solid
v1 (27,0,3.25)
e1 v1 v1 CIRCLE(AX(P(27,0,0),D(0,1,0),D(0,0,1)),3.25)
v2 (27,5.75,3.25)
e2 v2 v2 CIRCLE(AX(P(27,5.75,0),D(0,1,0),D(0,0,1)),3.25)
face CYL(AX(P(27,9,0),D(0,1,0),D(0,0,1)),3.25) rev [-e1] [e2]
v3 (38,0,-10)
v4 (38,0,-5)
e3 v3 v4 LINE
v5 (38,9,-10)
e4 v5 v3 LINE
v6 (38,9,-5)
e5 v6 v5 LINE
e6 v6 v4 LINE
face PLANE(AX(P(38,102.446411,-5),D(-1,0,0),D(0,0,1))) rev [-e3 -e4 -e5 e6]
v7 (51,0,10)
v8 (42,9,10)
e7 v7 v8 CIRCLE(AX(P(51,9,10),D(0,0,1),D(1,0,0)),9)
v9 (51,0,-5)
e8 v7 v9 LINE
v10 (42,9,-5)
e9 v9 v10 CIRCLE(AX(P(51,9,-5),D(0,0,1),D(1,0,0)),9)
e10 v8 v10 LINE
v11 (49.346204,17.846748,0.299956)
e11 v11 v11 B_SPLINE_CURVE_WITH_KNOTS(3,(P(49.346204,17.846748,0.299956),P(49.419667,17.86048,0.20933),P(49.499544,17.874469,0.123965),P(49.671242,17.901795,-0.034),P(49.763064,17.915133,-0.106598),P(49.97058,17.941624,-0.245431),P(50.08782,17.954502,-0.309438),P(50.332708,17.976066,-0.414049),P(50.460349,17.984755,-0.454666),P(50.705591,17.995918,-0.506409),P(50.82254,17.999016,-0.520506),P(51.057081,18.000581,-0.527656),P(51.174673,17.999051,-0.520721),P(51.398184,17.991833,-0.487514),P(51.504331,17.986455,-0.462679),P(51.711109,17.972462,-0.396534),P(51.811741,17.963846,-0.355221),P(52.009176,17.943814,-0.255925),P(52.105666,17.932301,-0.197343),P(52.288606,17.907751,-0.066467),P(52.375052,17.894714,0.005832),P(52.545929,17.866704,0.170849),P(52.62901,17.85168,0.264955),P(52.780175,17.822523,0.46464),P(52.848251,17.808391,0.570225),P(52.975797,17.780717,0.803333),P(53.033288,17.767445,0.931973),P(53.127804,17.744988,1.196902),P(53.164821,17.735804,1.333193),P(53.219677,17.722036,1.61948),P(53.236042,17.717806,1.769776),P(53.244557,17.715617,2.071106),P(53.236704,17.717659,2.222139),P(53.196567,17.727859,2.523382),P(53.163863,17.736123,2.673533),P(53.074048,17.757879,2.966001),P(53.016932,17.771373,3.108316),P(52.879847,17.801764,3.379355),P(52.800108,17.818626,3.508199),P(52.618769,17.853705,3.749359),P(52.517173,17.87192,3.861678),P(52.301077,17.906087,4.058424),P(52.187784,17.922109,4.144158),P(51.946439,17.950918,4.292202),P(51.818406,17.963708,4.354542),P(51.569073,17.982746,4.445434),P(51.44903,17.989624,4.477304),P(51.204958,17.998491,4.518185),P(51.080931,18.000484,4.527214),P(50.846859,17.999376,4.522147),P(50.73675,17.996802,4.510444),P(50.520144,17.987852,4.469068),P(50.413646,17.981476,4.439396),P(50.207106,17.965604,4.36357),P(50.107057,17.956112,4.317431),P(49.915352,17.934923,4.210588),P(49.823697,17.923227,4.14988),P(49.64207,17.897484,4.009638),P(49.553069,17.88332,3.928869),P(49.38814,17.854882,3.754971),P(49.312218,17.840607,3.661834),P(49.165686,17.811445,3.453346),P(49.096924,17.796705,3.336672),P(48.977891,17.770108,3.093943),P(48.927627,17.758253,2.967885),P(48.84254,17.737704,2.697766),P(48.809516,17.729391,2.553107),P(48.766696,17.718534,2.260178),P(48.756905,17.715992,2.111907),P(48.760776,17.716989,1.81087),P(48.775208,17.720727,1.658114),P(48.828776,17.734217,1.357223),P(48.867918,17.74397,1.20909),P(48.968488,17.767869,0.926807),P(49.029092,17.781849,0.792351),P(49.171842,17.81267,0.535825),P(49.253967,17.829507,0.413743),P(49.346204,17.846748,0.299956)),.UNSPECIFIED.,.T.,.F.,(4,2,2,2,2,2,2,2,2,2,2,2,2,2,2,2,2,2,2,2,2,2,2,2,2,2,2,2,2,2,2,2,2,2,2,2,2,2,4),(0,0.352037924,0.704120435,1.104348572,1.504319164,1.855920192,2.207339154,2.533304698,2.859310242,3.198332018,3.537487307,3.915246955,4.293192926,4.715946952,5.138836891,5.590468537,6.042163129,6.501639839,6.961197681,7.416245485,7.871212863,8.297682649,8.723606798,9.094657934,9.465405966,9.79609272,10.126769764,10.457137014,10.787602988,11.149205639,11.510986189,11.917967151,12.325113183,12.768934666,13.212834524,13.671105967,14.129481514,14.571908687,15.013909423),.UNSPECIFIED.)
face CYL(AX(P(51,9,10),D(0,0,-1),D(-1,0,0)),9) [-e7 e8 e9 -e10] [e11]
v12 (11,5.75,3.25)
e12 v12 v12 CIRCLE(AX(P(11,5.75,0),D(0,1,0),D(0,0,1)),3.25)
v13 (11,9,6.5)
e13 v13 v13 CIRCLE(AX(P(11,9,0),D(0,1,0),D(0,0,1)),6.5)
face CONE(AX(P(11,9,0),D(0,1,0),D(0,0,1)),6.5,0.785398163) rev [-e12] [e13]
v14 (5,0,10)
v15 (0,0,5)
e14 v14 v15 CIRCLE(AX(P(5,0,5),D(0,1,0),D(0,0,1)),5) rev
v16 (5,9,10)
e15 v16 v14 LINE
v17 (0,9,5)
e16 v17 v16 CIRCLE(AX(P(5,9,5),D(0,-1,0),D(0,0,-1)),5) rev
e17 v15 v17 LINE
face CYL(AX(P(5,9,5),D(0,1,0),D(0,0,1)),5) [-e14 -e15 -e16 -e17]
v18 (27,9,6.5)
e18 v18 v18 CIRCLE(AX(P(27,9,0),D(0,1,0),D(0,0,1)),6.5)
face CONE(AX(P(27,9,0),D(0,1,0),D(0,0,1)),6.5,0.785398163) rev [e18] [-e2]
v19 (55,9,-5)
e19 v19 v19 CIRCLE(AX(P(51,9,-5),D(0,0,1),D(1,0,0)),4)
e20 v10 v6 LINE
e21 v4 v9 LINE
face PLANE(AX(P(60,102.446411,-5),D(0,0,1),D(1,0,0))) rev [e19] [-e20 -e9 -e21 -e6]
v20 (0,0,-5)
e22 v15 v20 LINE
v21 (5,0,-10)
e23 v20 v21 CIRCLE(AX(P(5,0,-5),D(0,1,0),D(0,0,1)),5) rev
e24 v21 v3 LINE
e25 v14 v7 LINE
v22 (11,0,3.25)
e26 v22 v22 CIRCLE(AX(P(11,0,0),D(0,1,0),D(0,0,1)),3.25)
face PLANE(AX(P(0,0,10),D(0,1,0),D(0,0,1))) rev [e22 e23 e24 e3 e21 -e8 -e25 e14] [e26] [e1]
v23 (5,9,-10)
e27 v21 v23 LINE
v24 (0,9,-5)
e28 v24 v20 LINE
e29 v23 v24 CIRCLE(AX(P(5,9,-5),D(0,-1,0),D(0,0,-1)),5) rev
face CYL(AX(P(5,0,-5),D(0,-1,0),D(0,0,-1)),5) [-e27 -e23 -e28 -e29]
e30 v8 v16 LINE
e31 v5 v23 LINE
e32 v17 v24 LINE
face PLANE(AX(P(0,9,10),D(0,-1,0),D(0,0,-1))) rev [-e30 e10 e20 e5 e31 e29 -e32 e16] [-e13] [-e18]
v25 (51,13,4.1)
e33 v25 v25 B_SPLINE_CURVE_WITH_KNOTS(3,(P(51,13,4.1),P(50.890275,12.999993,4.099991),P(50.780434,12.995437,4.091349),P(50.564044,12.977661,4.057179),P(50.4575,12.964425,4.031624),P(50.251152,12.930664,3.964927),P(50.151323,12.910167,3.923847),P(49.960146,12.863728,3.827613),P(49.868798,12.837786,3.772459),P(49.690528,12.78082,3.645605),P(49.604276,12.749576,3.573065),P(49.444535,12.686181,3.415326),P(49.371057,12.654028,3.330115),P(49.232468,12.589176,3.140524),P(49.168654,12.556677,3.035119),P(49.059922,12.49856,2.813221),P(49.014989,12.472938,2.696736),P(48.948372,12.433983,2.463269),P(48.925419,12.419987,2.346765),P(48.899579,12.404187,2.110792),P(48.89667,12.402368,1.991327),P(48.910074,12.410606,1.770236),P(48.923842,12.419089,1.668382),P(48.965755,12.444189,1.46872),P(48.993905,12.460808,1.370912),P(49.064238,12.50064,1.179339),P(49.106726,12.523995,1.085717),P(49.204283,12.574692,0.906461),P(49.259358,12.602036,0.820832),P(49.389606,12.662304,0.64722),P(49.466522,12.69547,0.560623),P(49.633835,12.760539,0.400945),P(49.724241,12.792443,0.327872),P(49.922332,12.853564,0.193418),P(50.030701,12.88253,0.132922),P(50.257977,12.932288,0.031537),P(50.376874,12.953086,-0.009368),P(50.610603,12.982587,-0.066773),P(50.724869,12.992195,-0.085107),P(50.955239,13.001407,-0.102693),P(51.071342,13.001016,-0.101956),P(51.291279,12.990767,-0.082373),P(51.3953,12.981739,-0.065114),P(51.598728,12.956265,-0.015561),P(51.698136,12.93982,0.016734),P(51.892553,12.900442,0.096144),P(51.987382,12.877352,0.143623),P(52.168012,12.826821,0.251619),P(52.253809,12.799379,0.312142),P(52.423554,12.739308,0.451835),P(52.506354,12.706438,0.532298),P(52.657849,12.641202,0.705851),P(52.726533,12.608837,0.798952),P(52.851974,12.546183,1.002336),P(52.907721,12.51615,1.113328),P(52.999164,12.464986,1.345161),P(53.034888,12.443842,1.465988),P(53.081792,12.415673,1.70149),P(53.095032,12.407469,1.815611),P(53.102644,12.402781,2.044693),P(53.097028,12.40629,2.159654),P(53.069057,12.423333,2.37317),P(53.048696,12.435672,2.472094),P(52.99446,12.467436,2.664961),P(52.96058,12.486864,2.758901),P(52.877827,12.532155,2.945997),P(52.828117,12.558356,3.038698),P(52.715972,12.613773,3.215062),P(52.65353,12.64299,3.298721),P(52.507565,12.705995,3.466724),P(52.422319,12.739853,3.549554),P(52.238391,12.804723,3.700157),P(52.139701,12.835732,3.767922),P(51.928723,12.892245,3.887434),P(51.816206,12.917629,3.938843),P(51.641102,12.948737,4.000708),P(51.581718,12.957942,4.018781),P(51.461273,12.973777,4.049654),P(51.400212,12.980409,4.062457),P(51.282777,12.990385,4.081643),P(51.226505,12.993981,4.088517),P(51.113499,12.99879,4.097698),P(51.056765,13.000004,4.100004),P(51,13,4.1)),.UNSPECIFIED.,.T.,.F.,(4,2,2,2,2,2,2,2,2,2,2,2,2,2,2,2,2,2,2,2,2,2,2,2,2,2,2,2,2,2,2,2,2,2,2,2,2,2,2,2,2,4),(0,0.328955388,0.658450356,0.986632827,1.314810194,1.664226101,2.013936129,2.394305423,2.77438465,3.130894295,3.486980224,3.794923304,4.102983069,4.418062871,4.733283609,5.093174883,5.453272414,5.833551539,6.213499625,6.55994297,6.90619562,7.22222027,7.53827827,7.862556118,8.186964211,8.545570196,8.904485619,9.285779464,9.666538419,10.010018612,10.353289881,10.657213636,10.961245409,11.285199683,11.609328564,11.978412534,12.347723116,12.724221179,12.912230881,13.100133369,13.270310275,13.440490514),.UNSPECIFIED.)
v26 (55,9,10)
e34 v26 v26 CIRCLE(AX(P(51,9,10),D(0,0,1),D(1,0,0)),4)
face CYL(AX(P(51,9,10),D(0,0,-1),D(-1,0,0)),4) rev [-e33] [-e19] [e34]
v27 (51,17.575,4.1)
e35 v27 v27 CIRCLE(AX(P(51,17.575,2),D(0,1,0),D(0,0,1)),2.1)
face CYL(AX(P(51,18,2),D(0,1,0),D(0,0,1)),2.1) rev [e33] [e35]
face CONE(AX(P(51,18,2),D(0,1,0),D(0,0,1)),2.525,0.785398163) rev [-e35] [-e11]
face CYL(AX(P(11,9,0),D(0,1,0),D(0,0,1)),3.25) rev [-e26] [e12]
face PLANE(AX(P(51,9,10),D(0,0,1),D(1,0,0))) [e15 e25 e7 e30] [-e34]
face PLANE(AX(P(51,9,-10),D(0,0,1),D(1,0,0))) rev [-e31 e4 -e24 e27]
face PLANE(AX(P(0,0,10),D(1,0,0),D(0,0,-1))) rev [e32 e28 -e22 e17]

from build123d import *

# Parameters (mm, degrees)
SKETCH_1_R                        = 4
EXTRUDE_1_DEPTH                   = 10
CUT_EXTRUDE_1_DEPTH               = 62.489836559
CUT_EXTRUDE_1_DEPTH_BACK          = 62.489836559
HOLE_WIZARD_6_5_6_5_1_D           = 6.5
HOLE_WIZARD_6_5_6_5_1_DEPTH       = 13
HOLE_WIZARD_6_5_6_5_1_CSINK_D     = 13
HOLE_WIZARD_6_5_6_5_1_CSINK_ANGLE = 90
HOLE_WIZARD_6_5_6_5_1_TIP         = 1.952797012
FILLET_1_R                        = 5


# Read off the part's stored shape, not the designer's step: M5 螺纹孔1
with BuildPart() as part:
    # 草图1 → 凸台-拉伸1 (new, symmetric)
    with BuildSketch(Plane.XY):
        with BuildLine():
            Line((0, 0), (51, 0))
            ThreePointArc((51, 0), (57.363961031, 15.363961031), (42, 9))
            Line((42, 9), (0, 9))
            Line((0, 9), (0, 0))
        make_face()
        with Locations((51, 9)):
            Circle(SKETCH_1_R, mode=Mode.SUBTRACT)
    extrude(amount=EXTRUDE_1_DEPTH, both=True)

    # 草图2 → 切除-拉伸1 (cut, two sides: drawn at the far end of the back side and taken through both)
    with BuildSketch(Plane(origin=(0, 9, 0), x_dir=(1, 0, 0), z_dir=(0, 1, 0)).offset(-CUT_EXTRUDE_1_DEPTH_BACK)):
        Polygon((193.693168769, 5), (60, 5), (38, 5), (38, 10), (38, 143.693168769), (215.856075393, 343.349548449), (371.549244162, 204.65637968), align=None)
    extrude(amount=CUT_EXTRUDE_1_DEPTH + CUT_EXTRUDE_1_DEPTH_BACK, mode=Mode.SUBTRACT)

    # Ø6.5 (6.5) 直径孔1
    with Locations(Plane(origin=(0, 9, 0), x_dir=(1, 0, 0), z_dir=(0, 1, 0))):
        with Locations((11, 0), (27, 0)):
            CounterSinkHole(HOLE_WIZARD_6_5_6_5_1_D / 2, HOLE_WIZARD_6_5_6_5_1_CSINK_D / 2, depth=HOLE_WIZARD_6_5_6_5_1_DEPTH, counter_sink_angle=HOLE_WIZARD_6_5_6_5_1_CSINK_ANGLE)
            with Locations((0, 0, -(HOLE_WIZARD_6_5_6_5_1_DEPTH + HOLE_WIZARD_6_5_6_5_1_TIP / 2))):  # 118° drill point
                Cone(0, HOLE_WIZARD_6_5_6_5_1_D / 2, HOLE_WIZARD_6_5_6_5_1_TIP, mode=Mode.SUBTRACT)

    # M5 螺纹孔1 outline → M5 螺纹孔1 (revolve, cut)
    with BuildSketch(Plane(origin=(51, 0, 2), x_dir=(1, 0, 0), z_dir=(0, 0, 1))):
        Polygon((2.52510553, 18.00010553), (0, 18.00010553), (0, 12.404132041), (2.1, 12.404132041), (2.1, 17.575), align=None)
    revolve(axis=Axis((51, 0, 2), (0, 1, 0)), mode=Mode.SUBTRACT)

    # 圆角1
    fillet_1_edges = [part.edges().sort_by_distance(p)[0] for p in [
        (0, 4.5, 10),
        (0, 4.5, -10),
    ]]
    fillet(fillet_1_edges, radius=FILLET_1_R)


solid = part.part
